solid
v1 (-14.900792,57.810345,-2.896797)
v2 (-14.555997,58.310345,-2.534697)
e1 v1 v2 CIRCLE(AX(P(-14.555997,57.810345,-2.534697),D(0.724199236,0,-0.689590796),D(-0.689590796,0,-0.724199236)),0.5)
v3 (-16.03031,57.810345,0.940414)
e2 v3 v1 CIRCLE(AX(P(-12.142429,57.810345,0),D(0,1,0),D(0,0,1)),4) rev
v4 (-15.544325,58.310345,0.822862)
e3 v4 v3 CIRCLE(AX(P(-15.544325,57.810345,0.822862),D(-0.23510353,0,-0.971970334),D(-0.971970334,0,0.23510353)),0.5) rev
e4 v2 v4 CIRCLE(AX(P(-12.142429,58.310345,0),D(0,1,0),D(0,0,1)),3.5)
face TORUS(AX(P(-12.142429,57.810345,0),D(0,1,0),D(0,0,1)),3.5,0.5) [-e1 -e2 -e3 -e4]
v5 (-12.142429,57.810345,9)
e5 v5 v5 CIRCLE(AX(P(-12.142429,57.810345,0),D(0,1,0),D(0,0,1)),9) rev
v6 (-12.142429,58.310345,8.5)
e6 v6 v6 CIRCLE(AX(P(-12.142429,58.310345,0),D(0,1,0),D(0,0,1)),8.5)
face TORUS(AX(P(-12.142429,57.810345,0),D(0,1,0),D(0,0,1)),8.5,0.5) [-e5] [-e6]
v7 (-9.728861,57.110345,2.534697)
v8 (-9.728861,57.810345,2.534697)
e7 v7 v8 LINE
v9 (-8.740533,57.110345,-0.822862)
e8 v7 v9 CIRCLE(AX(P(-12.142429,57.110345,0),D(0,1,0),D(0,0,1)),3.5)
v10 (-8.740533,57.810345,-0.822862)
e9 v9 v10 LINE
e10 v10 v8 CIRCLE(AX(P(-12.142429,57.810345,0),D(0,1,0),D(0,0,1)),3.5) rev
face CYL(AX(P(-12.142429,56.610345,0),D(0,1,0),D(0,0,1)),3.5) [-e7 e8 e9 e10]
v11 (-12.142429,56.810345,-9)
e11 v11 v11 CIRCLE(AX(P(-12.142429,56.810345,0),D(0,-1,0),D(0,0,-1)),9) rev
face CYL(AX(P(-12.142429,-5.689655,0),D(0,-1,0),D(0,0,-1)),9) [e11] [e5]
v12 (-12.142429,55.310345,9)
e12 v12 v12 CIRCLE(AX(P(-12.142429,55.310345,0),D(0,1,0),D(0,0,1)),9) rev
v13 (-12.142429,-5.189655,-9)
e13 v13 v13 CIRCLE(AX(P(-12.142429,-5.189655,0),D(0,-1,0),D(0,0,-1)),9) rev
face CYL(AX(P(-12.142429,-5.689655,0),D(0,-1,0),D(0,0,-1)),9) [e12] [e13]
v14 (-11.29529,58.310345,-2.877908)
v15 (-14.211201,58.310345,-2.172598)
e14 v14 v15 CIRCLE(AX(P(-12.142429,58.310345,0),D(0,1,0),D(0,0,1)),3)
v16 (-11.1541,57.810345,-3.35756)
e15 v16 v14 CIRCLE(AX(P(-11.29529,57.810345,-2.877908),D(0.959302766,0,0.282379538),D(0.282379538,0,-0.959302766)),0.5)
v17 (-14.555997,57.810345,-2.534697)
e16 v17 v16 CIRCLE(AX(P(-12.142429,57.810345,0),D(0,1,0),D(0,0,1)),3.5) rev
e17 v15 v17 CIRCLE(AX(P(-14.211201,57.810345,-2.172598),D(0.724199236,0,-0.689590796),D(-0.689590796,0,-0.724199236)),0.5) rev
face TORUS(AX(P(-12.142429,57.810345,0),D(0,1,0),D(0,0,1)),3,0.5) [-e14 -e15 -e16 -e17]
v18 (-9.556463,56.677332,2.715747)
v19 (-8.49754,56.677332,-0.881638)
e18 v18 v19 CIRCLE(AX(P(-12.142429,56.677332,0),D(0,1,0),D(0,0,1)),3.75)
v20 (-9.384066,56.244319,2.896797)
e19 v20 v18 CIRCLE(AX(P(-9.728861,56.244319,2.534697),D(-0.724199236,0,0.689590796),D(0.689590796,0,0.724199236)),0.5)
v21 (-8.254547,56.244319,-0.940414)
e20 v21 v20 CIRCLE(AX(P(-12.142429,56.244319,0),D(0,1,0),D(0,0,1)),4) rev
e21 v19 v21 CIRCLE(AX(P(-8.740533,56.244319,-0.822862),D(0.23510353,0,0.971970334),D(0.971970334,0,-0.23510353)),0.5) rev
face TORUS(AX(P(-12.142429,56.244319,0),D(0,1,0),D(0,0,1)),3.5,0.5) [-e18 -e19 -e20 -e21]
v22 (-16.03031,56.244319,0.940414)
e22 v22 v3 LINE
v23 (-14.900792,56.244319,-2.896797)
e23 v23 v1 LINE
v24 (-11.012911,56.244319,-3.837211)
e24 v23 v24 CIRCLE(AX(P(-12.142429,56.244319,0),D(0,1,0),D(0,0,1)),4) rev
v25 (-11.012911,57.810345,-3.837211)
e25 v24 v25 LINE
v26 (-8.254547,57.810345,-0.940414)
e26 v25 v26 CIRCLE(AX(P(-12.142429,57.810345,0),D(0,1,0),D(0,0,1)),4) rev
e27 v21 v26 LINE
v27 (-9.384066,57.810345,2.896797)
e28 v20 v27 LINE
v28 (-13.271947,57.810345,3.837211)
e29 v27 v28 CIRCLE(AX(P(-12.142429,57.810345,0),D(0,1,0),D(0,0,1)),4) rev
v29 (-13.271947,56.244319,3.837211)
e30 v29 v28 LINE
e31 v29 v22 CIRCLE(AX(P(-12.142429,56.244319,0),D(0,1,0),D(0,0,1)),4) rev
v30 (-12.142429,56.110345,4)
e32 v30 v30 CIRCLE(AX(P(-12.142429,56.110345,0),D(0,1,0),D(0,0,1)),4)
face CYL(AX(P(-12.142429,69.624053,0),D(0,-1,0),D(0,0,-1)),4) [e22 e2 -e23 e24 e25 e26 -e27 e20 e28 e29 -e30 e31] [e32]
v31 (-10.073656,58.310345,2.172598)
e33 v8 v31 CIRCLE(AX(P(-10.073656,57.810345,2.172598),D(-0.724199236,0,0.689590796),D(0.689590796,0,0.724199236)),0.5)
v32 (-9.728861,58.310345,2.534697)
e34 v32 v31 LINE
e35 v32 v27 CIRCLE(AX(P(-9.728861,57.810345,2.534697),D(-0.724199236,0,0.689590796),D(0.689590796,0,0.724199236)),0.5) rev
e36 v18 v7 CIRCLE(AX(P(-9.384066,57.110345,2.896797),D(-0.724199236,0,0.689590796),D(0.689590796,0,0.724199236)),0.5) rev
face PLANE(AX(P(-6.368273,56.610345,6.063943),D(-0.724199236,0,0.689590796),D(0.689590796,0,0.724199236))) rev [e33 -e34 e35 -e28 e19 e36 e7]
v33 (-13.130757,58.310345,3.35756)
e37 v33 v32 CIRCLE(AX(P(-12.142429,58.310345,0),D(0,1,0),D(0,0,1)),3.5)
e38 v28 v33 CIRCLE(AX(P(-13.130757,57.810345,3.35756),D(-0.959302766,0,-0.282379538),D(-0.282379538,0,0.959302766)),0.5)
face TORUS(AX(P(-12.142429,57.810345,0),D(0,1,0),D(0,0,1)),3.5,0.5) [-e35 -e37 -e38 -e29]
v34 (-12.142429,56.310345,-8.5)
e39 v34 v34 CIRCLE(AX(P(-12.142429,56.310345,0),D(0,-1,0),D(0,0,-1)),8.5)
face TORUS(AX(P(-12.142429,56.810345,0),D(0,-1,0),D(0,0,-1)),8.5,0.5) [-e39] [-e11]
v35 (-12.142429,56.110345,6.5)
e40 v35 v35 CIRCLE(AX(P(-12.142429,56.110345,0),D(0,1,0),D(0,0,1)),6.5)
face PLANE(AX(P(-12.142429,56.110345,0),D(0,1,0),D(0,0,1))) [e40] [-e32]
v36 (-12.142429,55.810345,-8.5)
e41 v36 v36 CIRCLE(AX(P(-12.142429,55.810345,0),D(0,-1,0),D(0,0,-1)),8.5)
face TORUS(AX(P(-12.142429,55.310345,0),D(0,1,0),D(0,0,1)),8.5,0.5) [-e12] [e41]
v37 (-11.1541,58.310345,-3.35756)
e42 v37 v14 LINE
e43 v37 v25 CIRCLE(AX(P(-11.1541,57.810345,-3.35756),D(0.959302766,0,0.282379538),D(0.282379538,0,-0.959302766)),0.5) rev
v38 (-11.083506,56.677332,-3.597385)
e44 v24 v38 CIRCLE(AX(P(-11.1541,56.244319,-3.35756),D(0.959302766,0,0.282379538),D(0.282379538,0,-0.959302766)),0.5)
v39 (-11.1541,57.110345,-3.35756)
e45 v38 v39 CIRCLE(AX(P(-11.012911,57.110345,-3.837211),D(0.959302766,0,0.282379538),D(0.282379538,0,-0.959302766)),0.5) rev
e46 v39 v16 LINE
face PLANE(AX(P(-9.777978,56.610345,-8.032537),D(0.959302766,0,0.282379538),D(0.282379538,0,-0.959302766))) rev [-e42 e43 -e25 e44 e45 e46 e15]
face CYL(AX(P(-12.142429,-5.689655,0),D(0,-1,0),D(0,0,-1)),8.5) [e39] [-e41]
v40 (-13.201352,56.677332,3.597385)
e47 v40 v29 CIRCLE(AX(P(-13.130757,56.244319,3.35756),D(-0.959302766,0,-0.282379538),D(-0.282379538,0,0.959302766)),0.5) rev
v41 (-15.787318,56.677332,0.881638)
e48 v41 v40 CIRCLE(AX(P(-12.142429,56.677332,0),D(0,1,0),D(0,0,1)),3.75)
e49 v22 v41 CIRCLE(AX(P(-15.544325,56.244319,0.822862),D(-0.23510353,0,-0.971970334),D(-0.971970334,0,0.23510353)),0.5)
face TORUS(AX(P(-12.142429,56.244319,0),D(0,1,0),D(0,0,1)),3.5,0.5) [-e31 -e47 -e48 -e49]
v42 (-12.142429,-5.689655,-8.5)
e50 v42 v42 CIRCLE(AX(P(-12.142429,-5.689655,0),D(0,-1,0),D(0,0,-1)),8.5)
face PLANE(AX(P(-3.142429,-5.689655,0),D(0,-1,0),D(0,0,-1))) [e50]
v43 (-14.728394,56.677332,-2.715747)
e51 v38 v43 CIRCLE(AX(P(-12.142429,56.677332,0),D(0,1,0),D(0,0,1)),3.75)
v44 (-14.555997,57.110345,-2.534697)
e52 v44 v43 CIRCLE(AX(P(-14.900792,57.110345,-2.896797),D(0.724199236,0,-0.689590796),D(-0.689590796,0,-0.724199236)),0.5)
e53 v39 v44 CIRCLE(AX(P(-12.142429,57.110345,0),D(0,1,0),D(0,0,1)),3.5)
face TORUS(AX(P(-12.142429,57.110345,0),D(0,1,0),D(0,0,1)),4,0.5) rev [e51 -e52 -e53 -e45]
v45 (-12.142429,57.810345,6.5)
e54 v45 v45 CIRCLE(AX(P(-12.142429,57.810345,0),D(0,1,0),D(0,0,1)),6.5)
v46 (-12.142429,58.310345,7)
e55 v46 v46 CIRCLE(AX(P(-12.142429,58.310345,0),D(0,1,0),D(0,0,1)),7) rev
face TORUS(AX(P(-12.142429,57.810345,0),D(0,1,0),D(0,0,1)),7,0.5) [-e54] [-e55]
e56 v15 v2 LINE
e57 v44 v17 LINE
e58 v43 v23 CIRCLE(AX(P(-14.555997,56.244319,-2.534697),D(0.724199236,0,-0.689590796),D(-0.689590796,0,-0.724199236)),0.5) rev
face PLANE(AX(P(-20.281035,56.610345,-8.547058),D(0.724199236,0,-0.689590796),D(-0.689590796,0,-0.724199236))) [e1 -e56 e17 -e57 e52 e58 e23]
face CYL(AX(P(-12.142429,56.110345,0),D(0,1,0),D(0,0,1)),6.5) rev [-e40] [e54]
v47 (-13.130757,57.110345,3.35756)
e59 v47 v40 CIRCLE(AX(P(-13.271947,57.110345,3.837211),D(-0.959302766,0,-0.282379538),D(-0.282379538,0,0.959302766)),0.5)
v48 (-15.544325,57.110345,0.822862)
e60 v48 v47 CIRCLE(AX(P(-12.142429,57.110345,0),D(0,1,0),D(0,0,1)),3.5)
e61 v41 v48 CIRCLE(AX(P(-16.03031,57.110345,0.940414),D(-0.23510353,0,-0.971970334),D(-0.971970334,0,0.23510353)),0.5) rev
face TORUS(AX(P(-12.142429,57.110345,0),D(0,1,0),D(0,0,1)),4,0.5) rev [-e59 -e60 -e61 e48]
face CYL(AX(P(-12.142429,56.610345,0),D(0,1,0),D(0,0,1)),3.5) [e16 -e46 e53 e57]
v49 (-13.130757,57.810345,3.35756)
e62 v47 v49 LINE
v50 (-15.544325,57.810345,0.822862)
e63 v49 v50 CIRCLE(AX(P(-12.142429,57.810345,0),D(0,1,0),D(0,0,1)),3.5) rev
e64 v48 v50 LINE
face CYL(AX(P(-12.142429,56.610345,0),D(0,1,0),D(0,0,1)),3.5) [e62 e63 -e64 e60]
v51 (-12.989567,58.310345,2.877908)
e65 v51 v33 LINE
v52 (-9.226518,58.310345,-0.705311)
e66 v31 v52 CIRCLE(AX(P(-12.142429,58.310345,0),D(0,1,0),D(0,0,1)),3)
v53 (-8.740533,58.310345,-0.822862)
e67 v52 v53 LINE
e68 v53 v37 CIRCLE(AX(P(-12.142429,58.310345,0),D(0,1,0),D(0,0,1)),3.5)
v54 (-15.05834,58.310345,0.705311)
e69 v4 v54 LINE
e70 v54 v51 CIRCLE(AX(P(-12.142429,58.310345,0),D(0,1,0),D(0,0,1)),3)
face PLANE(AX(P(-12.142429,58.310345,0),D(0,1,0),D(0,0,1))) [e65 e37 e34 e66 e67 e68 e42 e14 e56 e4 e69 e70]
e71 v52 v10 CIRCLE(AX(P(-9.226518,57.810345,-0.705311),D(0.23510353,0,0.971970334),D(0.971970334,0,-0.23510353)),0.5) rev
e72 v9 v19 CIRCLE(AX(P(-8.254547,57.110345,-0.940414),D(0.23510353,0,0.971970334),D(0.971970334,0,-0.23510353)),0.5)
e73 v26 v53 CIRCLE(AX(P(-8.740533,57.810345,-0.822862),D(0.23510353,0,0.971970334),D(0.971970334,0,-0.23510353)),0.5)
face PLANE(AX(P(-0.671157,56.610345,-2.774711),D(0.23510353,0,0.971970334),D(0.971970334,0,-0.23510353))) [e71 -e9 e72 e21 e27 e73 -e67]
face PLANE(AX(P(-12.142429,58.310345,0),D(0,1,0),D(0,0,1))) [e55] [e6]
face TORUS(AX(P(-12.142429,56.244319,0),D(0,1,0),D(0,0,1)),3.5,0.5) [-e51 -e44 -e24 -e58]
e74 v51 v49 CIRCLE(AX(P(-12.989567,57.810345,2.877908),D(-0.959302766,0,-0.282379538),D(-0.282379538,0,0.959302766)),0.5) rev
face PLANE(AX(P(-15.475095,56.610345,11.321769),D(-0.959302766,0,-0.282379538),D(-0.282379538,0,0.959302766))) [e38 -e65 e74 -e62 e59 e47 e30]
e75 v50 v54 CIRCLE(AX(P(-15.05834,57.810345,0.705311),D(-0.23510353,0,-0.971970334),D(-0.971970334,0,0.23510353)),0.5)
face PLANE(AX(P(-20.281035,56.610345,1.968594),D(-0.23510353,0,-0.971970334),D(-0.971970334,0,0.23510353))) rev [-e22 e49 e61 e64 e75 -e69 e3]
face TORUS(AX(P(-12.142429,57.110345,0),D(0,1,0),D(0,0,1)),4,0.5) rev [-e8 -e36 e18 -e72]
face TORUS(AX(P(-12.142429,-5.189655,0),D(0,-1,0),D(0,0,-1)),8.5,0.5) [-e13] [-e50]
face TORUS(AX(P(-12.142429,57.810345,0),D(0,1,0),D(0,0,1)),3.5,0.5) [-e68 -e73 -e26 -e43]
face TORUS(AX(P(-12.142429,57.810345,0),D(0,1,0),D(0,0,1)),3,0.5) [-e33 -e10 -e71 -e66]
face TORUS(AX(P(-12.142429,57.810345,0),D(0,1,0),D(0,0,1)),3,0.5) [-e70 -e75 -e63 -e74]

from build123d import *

# Parameters (mm, degrees)
FILLET1_R           = 0.5
FILLET2_R           = 0.5
SKETCH3_R           = 6.5
CUT_EXTRUDE1_DEPTH  = 2.2
SKETCH4_R           = 4
BOSS_EXTRUDE1_DEPTH = 2.2
FILLET3_R           = 0.5
CUT_EXTRUDE3_START  = -2.2
CUT_EXTRUDE3_DEPTH  = 2.2
CIRPATTERN1_COUNT   = 3
FILLET4_R           = 0.5
FILLET5_R           = 0.5
FILLET6_R           = 0.5


# Some blends are built 0.0001 mm under size
with BuildPart() as part:
    # Sketch2 → Revolve1 (revolve)
    with BuildSketch(Plane.XY, mode=Mode.PRIVATE) as revolve1_sk:
        Polygon((-12.142428786, -5.689655172), (-12.142428786, 58.310344828), (-3.142428786, 58.310344828), (-3.142428786, 56.310344828), (-3.642428786, 56.310344828), (-3.642428786, 55.810344828), (-3.142428786, 55.810344828), (-3.142428786, -5.689655172), align=None)
    revolve(revolve1_sk.sketch.rotate(Axis((-12.142428786, -5.689655172, 0), (0, 1, 0)), 90), axis=Axis((-12.142428786, -5.689655172, 0), (0, 1, 0)))

    # Fillet1
    fillet1_edges = [part.edges().sort_by_distance(p)[0] for p in [
        (-12.142428786, -5.689655172, 9),
    ]]
    fillet(fillet1_edges, radius=FILLET1_R)

    # Fillet2
    fillet2_edges = [part.edges().sort_by_distance(p)[0] for p in [
        (-12.142428786, 55.810344828, 9),
        (-12.142428786, 56.310344828, 9),
    ]]
    fillet(fillet2_edges, radius=FILLET2_R - 0.0001)  # a hair under: the kernel refuses the full size

    # Sketch3 → Cut-Extrude1 (cut)
    with BuildSketch(Plane(origin=(0, 58.310344828, 0), x_dir=(1, 0, 0), z_dir=(0, 1, 0))):
        with Locations(Location((-12.142428786, 0, 0), (0, 0, 270))):
            Circle(SKETCH3_R)
    extrude(amount=-CUT_EXTRUDE1_DEPTH, mode=Mode.SUBTRACT)

    # Sketch4 → Boss-Extrude1 (add)
    with BuildSketch(Plane(origin=(0, 56.110344828, 0), x_dir=(1, 0, 0), z_dir=(0, 1, 0))):
        with Locations(Location((-12.142428786, 0, 0), (0, 0, 270))):
            Circle(SKETCH4_R)
    extrude(amount=BOSS_EXTRUDE1_DEPTH)

    # Fillet3
    fillet3_edges = [part.edges().sort_by_distance(p)[0] for p in [
        (-12.142428786, 58.310344828, -6.5),
        (-12.142428786, 58.310344828, 9),
    ]]
    fillet(fillet3_edges, radius=FILLET3_R)

    # Sketch6 → Cut-Extrude3 (cut)
    with BuildSketch(Plane(origin=(0, 58.810344828, 0), x_dir=(1, 0, 0), z_dir=(0, 1, 0)).offset(CUT_EXTRUDE3_START)):
        with BuildLine():
            Line((-8.254547449, 0.940414119), (-8.740532616, 0.822862354))
            ThreePointArc((-8.740532616, 0.822862354), (-8.667041283, 0.414344909), (-8.642428786, 0))
            ThreePointArc((-8.642428786, 0), (-8.925482465, -1.378860534), (-9.728860999, -2.534697327))
            Line((-9.728860999, -2.534697327), (-9.384065601, -2.896796945))
            ThreePointArc((-9.384065601, -2.896796945), (-8.305217722, -1.129518151), (-8.254547449, 0.940414119))
        make_face()
    cut_extrude3 = extrude(amount=CUT_EXTRUDE3_DEPTH, mode=Mode.SUBTRACT)

    # CirPattern1: Cut-Extrude3 ×3 about axis
    cirpattern1_axis = Axis((-12.142428786, 0, 0), (0, 1, 0))
    for i in range(1, CIRPATTERN1_COUNT):
        add(cut_extrude3.rotate(cirpattern1_axis, i * 360 / CIRPATTERN1_COUNT), mode=Mode.SUBTRACT)

    # Fillet4
    fillet4_edges = [part.edges().sort_by_distance(p)[0] for p in [
        (-12.965291139, 58.310344828, -3.401896169),
        (-9.245631841, 58.310344828, -2.758363185),
        (-8.784869105, 58.310344828, 0.988328382),
        (-10.657031159, 58.310344828, 3.713972791),
        (-14.677126112, 58.310344828, 2.413567787),
        (-15.979639849, 58.310344828, -1.129518151),
    ]]
    fillet(fillet4_edges, radius=FILLET4_R - 0.0001)  # a hair under: the kernel refuses the full size

    # Fillet5
    fillet5_edges = [part.edges().sort_by_distance(p)[0] for p in [
        (-12.965291139, 56.610344828, -3.401896169),
        (-8.784869105, 56.610344828, 0.988328382),
        (-14.677126112, 56.610344828, 2.413567787),
    ]]
    fillet(fillet5_edges, radius=FILLET5_R - 0.0001)  # a hair under: the kernel refuses the full size

    # Fillet6
    # the kernel refuses this fillet: 0.5 mm, written as the material it takes off along each edge
    with BuildSketch(Plane(origin=(-12.142428786, 56.610344828, 0), x_dir=(0.6895907962440411, 0, 0.7241992362157734), z_dir=(-0.7241992362157734, 0, 0.6895907962440411))) as fillet6_piece_1:
        with BuildLine():
            CenterArc((3.5, -0.366067667), FILLET6_R, 0, 60.003308249)
            Line((3.749974997, 0.066959469), (3.774972497, 0.110262183))
            ThreePointArc((3.774972497, 0.110262183), (3.9999, 0.05), (4, 0.05))
            Line((4, 0.05), (4.05, 0))
            Line((4.05, 0), (4.05, -0.366067667))
            Line((4.05, -0.366067667), (4, -0.366067667))
        make_face()
    revolve(axis=Axis((-12.142428786, 56.610344828, 0), (0, 1, 0)), revolution_arc=60, mode=Mode.SUBTRACT)
    with BuildSketch(Plane(origin=(-12.142428786, 56.610344828, 0), x_dir=(0.28237953784212716, 0, -0.9593027658711648), z_dir=(0.9593027658711648, 0, 0.28237953784212716))) as fillet6_piece_2:
        with BuildLine():
            CenterArc((3.5, -0.366067667), FILLET6_R, 0, 60.003308249)
            Line((4, -0.366067667), (4.05, -0.366067667))
            Line((4.05, -0.366067667), (4.05, 0))
            Line((4.05, 0), (4, 0.05))
            ThreePointArc((4, 0.05), (3.9999, 0.05), (3.774972497, 0.110262183))
            Line((3.774972497, 0.110262183), (3.749974997, 0.066959469))
        make_face()
    revolve(axis=Axis((-12.142428786, 56.610344828, 0), (0, 1, 0)), revolution_arc=60, mode=Mode.SUBTRACT)
    with BuildSketch(Plane(origin=(-12.142428786, 56.610344828, 0), x_dir=(-0.9719703340861678, 0, 0.23510352965539105), z_dir=(-0.23510352965539105, 0, -0.9719703340861678))) as fillet6_piece_3:
        with BuildLine():
            CenterArc((3.5, -0.366067667), FILLET6_R, 0, 60.003308249)
            Line((3.749974997, 0.066959469), (3.774972497, 0.110262183))
            ThreePointArc((3.774972497, 0.110262183), (3.9999, 0.05), (4, 0.05))
            Line((4, 0.05), (4.05, 0))
            Line((4.05, 0), (4.05, -0.366067667))
            Line((4.05, -0.366067667), (4, -0.366067667))
        make_face()
    revolve(axis=Axis((-12.142428786, 56.610344828, 0), (0, 1, 0)), revolution_arc=60, mode=Mode.SUBTRACT)


solid = part.part
